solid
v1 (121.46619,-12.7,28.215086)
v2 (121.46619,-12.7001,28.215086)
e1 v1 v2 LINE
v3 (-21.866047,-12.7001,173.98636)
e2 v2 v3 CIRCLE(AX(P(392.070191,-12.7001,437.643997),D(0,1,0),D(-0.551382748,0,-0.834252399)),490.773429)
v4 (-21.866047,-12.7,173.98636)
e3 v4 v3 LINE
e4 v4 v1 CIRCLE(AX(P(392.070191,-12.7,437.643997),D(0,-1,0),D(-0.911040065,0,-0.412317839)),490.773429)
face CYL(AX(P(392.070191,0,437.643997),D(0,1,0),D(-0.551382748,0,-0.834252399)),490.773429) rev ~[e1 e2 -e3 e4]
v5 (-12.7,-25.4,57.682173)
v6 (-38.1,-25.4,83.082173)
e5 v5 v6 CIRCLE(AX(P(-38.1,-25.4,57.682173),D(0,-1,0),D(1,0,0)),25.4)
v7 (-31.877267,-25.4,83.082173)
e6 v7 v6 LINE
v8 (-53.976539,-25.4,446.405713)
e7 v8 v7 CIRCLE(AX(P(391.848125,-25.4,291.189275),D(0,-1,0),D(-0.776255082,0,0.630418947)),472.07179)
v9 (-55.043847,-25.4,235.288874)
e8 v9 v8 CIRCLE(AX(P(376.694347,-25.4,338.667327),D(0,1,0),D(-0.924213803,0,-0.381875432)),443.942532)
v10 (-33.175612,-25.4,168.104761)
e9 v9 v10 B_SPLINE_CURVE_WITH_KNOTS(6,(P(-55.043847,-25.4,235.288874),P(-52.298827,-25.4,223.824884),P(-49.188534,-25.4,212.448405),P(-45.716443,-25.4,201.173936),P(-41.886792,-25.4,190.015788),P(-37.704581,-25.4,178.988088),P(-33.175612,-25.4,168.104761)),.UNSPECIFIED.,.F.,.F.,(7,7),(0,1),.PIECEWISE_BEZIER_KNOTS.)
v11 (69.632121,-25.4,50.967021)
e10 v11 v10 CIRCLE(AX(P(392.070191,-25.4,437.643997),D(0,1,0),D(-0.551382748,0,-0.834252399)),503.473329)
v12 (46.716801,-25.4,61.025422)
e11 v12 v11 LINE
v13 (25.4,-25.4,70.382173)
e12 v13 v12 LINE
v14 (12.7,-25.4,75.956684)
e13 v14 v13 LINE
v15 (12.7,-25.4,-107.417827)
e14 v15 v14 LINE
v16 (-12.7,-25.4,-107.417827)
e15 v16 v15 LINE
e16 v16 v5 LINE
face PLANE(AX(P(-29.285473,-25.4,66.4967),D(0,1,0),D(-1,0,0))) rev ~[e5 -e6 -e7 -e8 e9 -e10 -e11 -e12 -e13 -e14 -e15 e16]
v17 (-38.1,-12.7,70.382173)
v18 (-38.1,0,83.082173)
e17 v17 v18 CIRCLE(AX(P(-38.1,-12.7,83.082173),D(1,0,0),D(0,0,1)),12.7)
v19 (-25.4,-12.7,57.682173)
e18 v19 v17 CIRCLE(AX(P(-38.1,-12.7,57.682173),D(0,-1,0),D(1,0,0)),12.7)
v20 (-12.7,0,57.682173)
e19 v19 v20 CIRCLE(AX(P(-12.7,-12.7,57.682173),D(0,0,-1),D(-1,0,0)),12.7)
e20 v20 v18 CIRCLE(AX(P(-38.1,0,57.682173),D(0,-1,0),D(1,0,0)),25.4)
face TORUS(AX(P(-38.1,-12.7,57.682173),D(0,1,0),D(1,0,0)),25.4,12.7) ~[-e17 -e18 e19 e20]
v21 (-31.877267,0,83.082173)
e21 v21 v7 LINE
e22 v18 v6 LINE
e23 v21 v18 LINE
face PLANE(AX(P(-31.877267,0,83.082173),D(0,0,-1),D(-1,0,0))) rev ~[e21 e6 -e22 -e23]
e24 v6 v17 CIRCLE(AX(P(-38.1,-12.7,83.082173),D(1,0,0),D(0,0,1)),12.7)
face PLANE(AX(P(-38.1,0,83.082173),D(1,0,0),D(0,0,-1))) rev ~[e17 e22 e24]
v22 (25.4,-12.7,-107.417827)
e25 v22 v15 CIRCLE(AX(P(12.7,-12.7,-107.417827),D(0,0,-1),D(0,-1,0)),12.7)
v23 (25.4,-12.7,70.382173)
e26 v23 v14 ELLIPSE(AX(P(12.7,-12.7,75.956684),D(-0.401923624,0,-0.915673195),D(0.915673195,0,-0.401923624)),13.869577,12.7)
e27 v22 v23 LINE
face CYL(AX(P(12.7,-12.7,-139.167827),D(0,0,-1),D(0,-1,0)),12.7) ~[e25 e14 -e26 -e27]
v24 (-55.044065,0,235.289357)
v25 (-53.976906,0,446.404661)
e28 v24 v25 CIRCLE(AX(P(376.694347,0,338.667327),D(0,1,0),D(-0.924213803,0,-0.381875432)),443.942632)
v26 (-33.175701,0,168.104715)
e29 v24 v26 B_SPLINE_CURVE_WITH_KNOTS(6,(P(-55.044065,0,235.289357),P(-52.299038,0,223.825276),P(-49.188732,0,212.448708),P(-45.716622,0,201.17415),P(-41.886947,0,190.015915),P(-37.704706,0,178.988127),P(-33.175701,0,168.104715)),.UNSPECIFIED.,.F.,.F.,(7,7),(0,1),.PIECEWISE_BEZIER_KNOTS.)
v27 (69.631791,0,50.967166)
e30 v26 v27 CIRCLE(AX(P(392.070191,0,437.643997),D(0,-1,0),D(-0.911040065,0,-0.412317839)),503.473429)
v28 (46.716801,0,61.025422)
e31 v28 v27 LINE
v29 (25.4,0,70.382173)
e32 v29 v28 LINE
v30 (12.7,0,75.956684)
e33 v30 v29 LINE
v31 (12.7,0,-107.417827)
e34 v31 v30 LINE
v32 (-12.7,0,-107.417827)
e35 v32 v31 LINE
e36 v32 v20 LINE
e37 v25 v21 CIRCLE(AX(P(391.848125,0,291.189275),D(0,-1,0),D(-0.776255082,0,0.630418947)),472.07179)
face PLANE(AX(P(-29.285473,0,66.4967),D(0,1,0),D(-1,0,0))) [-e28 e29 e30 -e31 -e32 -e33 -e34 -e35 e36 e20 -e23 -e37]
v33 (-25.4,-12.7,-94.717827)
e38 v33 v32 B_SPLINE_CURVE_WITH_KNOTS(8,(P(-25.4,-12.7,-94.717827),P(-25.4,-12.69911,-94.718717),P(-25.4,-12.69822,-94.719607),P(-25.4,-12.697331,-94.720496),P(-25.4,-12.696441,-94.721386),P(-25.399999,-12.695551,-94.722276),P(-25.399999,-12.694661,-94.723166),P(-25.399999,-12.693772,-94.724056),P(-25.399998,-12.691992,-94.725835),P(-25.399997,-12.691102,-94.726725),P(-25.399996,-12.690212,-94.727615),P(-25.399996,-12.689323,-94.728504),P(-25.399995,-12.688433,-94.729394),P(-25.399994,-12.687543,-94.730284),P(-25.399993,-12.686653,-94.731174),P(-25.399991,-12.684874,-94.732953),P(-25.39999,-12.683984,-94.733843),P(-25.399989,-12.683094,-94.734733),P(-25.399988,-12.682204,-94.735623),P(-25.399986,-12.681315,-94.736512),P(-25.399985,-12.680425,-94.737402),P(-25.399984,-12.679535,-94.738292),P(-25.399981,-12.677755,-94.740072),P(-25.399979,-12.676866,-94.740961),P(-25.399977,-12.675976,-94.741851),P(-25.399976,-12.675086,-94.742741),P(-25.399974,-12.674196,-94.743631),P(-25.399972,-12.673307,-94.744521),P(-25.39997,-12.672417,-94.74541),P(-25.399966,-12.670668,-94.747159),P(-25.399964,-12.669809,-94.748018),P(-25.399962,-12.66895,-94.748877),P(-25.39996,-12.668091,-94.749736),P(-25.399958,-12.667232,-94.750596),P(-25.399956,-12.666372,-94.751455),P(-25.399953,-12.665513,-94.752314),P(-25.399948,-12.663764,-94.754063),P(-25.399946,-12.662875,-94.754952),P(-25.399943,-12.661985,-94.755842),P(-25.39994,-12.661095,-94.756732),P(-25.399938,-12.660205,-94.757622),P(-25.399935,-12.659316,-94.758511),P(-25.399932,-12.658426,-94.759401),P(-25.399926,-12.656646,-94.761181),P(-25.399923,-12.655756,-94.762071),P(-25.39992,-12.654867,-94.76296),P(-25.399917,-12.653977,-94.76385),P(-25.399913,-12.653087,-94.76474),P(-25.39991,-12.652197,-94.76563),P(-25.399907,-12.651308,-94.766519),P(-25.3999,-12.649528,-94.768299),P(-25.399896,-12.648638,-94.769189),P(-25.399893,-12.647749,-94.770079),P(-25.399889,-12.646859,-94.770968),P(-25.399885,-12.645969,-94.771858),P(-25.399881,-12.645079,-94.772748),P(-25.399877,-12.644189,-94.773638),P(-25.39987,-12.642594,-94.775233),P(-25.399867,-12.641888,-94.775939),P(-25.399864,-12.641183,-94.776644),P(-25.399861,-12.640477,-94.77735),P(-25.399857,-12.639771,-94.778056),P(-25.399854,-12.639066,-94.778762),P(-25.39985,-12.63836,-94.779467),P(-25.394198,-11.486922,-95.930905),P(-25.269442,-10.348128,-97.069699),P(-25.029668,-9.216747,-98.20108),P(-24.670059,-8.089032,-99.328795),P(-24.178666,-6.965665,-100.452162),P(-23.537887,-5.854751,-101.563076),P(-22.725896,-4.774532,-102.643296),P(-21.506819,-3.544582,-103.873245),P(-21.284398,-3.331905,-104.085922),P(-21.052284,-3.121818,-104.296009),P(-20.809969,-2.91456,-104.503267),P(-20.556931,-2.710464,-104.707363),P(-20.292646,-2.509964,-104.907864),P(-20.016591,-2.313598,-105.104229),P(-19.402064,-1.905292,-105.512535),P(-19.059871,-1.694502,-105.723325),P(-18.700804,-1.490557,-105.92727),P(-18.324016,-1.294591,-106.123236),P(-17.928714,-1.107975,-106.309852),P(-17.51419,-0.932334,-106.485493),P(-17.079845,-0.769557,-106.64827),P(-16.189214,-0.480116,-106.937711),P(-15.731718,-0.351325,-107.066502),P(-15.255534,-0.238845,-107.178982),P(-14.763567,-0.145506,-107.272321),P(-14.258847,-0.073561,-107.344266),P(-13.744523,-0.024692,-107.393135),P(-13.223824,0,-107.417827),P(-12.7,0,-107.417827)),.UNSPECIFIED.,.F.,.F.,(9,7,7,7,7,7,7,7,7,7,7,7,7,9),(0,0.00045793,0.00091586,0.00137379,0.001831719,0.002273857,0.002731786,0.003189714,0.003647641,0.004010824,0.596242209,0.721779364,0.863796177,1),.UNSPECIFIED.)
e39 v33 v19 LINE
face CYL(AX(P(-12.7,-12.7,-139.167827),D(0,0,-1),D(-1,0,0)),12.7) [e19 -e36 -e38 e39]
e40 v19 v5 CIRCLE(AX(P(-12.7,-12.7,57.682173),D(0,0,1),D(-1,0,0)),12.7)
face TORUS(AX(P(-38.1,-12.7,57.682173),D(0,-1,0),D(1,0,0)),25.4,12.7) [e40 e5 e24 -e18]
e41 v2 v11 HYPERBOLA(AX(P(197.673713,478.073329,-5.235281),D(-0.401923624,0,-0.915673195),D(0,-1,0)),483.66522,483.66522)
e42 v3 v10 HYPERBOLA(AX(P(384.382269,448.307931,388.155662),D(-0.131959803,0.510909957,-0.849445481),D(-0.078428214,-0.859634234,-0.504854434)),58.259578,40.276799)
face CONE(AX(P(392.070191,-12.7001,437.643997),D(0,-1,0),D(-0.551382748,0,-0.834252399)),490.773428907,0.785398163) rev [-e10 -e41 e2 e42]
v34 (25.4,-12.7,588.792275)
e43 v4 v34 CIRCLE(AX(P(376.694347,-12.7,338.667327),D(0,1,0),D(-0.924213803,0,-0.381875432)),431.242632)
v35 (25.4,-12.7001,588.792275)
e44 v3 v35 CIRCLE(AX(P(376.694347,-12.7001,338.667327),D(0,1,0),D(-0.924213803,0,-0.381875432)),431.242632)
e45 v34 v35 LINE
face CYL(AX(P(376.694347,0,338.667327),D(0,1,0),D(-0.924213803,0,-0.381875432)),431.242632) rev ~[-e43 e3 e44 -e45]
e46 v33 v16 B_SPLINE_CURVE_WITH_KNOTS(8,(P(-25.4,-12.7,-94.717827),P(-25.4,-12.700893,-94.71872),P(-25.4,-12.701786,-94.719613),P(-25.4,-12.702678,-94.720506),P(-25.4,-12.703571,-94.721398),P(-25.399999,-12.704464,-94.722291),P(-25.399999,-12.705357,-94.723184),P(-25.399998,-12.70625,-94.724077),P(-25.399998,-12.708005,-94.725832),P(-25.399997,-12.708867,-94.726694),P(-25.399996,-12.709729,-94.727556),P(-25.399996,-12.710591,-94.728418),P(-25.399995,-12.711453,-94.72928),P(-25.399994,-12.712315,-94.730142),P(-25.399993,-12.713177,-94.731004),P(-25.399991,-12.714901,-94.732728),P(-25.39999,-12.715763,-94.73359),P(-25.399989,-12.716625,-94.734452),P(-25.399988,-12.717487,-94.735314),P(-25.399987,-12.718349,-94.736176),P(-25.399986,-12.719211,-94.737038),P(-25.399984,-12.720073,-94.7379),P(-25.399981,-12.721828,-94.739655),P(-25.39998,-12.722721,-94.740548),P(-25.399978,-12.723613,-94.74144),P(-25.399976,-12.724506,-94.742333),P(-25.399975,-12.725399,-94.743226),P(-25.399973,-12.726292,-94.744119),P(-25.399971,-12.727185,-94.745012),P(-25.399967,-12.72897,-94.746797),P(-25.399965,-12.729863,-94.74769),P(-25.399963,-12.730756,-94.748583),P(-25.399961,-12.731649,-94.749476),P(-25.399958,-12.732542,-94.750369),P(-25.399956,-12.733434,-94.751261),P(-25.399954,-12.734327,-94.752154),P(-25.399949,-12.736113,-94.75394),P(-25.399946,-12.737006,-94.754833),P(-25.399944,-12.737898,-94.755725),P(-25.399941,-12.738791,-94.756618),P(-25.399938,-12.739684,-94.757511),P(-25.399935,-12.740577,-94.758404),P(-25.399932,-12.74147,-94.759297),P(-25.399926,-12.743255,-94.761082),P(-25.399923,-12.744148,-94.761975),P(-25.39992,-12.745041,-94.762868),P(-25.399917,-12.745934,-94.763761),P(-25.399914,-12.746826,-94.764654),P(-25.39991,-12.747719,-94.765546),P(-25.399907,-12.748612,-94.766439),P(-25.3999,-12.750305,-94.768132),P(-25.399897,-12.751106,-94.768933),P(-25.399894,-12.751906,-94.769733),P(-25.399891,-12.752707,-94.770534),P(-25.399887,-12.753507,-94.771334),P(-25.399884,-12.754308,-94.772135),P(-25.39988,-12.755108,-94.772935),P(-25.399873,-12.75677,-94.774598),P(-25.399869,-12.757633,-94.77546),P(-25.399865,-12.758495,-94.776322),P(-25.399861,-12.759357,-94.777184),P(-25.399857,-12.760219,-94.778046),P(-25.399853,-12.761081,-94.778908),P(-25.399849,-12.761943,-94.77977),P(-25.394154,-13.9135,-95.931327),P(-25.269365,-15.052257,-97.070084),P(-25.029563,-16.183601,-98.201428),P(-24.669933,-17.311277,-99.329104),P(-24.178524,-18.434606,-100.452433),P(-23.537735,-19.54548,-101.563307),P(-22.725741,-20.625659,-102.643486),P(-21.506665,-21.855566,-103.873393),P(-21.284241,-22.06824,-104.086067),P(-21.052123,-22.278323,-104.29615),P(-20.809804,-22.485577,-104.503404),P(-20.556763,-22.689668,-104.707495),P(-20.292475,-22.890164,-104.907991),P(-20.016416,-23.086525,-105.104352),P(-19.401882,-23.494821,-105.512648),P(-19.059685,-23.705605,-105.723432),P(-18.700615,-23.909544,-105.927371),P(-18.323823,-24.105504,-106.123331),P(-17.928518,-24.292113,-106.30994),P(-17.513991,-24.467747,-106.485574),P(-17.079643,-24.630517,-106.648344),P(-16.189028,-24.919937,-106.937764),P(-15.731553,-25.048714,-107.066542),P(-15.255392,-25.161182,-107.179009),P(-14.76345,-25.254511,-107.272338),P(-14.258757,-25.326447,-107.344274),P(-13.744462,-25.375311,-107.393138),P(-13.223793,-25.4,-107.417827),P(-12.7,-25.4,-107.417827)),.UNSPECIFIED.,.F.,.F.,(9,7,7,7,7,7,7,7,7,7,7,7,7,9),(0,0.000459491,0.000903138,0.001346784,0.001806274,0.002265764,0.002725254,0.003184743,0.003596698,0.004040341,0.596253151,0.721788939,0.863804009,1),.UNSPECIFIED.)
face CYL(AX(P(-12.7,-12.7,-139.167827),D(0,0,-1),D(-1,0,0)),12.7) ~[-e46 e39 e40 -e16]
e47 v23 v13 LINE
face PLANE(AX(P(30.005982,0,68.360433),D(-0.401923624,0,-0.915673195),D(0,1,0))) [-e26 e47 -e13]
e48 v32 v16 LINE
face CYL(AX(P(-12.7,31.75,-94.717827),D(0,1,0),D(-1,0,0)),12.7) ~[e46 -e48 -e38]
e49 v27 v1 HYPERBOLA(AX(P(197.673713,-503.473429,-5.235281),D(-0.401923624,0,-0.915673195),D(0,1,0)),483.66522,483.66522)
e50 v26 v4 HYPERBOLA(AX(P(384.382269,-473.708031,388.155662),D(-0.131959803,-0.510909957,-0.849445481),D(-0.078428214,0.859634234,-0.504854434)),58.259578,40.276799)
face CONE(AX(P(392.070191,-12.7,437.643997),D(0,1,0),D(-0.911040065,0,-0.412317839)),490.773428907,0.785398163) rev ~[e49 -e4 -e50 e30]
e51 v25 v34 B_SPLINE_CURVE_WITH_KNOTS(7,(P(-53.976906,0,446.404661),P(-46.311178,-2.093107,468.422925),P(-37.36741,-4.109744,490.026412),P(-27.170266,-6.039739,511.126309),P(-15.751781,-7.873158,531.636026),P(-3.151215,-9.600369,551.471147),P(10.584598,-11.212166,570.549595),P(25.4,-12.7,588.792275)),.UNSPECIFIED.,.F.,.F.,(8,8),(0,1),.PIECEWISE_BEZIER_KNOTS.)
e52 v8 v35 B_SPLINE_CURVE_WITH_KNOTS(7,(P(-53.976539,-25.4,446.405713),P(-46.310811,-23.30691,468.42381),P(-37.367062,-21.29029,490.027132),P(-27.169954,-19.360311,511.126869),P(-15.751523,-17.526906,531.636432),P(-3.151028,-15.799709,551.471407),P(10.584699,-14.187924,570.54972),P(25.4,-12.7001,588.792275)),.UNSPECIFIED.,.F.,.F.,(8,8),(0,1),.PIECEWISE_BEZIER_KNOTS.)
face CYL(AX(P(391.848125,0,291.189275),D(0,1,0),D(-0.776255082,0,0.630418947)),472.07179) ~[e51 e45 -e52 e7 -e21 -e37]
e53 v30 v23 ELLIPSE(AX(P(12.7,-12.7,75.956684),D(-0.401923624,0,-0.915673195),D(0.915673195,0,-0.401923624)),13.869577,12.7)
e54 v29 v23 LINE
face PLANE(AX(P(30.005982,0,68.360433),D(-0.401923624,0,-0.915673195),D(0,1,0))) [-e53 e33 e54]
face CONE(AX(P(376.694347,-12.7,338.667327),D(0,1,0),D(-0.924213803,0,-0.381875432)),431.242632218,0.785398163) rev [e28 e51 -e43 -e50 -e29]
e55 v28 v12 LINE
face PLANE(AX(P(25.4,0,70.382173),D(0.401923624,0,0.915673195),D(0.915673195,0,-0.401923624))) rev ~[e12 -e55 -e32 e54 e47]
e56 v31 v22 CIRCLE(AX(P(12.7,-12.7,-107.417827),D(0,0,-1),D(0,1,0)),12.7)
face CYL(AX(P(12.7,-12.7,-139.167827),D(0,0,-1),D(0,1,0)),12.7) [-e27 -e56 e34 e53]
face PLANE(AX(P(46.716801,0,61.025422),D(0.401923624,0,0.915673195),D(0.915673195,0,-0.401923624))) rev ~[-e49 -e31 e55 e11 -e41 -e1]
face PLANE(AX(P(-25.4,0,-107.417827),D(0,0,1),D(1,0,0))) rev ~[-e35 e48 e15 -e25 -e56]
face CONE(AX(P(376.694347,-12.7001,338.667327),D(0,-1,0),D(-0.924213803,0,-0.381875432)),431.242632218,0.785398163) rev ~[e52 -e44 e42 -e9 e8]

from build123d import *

# Parameters (mm, degrees)
F1_DEPTH     = 25.4
F2_T1_DEPTH  = 25.4
F2_T3_DEPTH  = 196.85
F2_T5_DEPTH  = 88.9
F2_T10_DEPTH = 241.3
F2_T15_DEPTH = 241.3
F2_T18_ANGLE = 233.2969892374
F2_T20_ANGLE = 233.2969892374
F3_C1_SIZE   = 12.7
F3_C2_SIZE   = 12.7
F3_C3_SIZE   = 12.6999
F3_C4_SIZE   = 12.6999


# Not quite as in the source:
# - a fillet or chamfer that OpenCascade refuses, or shapes differently, is made with other operations: its cross-section is extruded or revolved along the edge and cut away or added
# - a fillet or chamfer is up to 0.001 mm smaller than in the source, because OpenCascade refuses the exact size


with BuildPart() as f1:
    # F0 (on Front) → F1 (new body)
    with BuildSketch(Plane.XZ):
        Polygon((-25.4, -107.4178270914), (0, -107.4178270914), (25.4, -107.4178270914), (25.4, 70.3821729086), (-25.4, 70.3821729086), align=None)
        with BuildLine():
            ThreePointArc((-31.8772674395, 83.0821729086), (-28.6865783939, 76.7077201152), (-25.4, 70.3821729086))
            Line((-25.4, 70.3821729086), (25.4, 70.3821729086))
            Line((25.4, 70.3821729086), (46.7168006713, 61.0254222331))
            ThreePointArc((46.7168006713, 61.0254222331), (8.0726901659, 114.8632107301), (-21.8660467054, 173.9863600165))
            ThreePointArc((-21.8660467054, 173.9863600165), (-51.7756284743, 387.4903570682), (25.4, 588.7922751123))
            ThreePointArc((25.4, 588.7922751123), (-77.2246025315, 344.3169540256), (-31.8772674395, 83.0821729086))
        make_face()
        with BuildLine():
            Line((-38.1, 70.3821729086), (-25.4, 70.3821729086))
            ThreePointArc((-25.4, 70.3821729086), (-28.6865783939, 76.7077201152), (-31.8772674395, 83.0821729086))
            Line((-31.8772674395, 83.0821729086), (-38.1, 83.0821729086))
            Line((-38.1, 83.0821729086), (-38.1, 70.3821729086))
        make_face()
        with BuildLine():
            ThreePointArc((-21.8660467054, 173.9863600165), (8.0726901659, 114.8632107301), (46.7168006713, 61.0254222331))
            Line((46.7168006713, 61.0254222331), (121.4661896229, 28.2150860876))
            ThreePointArc((121.4661896229, 28.2150860876), (42.125694257, 93.5547531424), (-21.8660467054, 173.9863600165))
        make_face()
    extrude(amount=F1_DEPTH)

    # F2: fillet of radius 12.7 on 6 edges, made by hand

    # F2_s2 → F2_t1 (join)
    with BuildSketch(Plane.XZ):
        with BuildLine():
            ThreePointArc((-25.4, 57.6821729086), (-29.1197438789, 66.6624290297), (-38.1, 70.3821729086))
            Line((-38.1, 70.3821729086), (-25.4, 70.3821729086))
            Line((-25.4, 70.3821729086), (-25.4, 57.6821729086))
        make_face()
    extrude(amount=F2_T1_DEPTH)

    # F2_s4 → F2_t3 (cut)
    with BuildSketch(Plane.XY.offset(-139.1678270914)):
        with BuildLine():
            ThreePointArc((-25.4, -12.7), (-21.6802561211, -3.7197438789), (-12.7, 0))
            Line((-12.7, 0), (-25.4, 0))
            Line((-25.4, 0), (-25.4, -12.7))
        make_face()
        with BuildLine():
            ThreePointArc((-25.4, -12.7), (-21.6802561211, -21.6802561211), (-12.7, -25.4))
            Line((-12.7, -25.4), (-25.4, -25.4))
            Line((-25.4, -25.4), (-25.4, -12.7))
        make_face()
    extrude(amount=F2_T3_DEPTH, mode=Mode.SUBTRACT)

    # F2_s6 → F2_t5 (cut)
    with BuildSketch(Plane.XZ.offset(-31.75)):
        with BuildLine():
            ThreePointArc((-25.4, -94.7178270914), (-21.6802561211, -103.6980832124), (-12.7, -107.4178270914))
            Line((-12.7, -107.4178270914), (-25.4, -107.4178270914))
            Line((-25.4, -107.4178270914), (-25.4, -94.7178270914))
        make_face()
    extrude(amount=F2_T5_DEPTH, mode=Mode.SUBTRACT)


with BuildPart() as f2_tool8:
    # F2_s9 → F2_t10 (new body)
    with BuildSketch(Plane.XY.offset(-139.1678270914)):
        with BuildLine():
            ThreePointArc((12.7, 0), (21.6802561211, -3.7197438789), (25.4, -12.7))
            Line((25.4, -12.7), (25.4, 0))
            Line((25.4, 0), (12.7, 0))
        make_face()
    extrude(amount=F2_T10_DEPTH)

    split(bisect_by=Plane(origin=(30.005981648, 0, 68.3604332226), x_dir=(0, 1, 0), z_dir=(-0.4019236244, 0, -0.9156731951)), keep=Keep.TOP)


with BuildPart() as f1_1:
    add(f1.part)

    # F2_t7: cut F2_tool8
    add(f2_tool8.part, mode=Mode.SUBTRACT)


with BuildPart() as f2_tool13:
    # F2_s14 → F2_t15 (new body)
    with BuildSketch(Plane.XY.offset(-139.1678270914)):
        with BuildLine():
            ThreePointArc((12.7, -25.4), (21.6802561211, -21.6802561211), (25.4, -12.7))
            Line((25.4, -12.7), (25.4, -25.4))
            Line((25.4, -25.4), (12.7, -25.4))
        make_face()
    extrude(amount=F2_T15_DEPTH)

    split(bisect_by=Plane(origin=(30.005981648, 0, 68.3604332226), x_dir=(0, 1, 0), z_dir=(-0.4019236244, 0, -0.9156731951)), keep=Keep.TOP)


with BuildPart() as f1_2:
    add(f1_1.part)

    # F2_t12: cut F2_tool13
    add(f2_tool13.part, mode=Mode.SUBTRACT)

    # F2_s17 → F2_t18 (revolve, cut)
    with BuildSketch(Plane.XY.offset(57.6821729086)):
        with BuildLine():
            ThreePointArc((-12.7, -25.4), (-21.6802561211, -21.6802561211), (-25.4, -12.7))
            Line((-25.4, -12.7), (-25.4, -25.4))
            Line((-25.4, -25.4), (-12.7, -25.4))
        make_face()
    revolve(axis=Axis((-38.1, -25.4, 57.6821729086), (0, -1, 0)), revolution_arc=F2_T18_ANGLE, mode=Mode.SUBTRACT)

    # F2_s19 → F2_t20 (revolve, cut)
    with BuildSketch(Plane.XY.offset(57.6821729086)):
        with BuildLine():
            ThreePointArc((-12.7, 0), (-21.6802561211, -3.7197438789), (-25.4, -12.7))
            Line((-25.4, -12.7), (-25.4, 0))
            Line((-25.4, 0), (-12.7, 0))
        make_face()
    revolve(axis=Axis((-38.1, 0, 57.6821729086), (0, -1, 0)), revolution_arc=F2_T20_ANGLE, mode=Mode.SUBTRACT)

    # F3: chamfer of 12.7 on 4 edges, made by hand

    # F3_c1
    f3_c1_edges = [f1_2.edges().sort_by_distance(p)[0] for p in [
        (-51.7756284743, 0, 387.4903570682),
    ]]
    chamfer(f3_c1_edges, length=F3_C1_SIZE)

    # F3_c2
    f3_c2_edges = [f1_2.edges().sort_by_distance(p)[0] for p in [
        (42.125694257, 0, 93.5547531424),
    ]]
    chamfer(f3_c2_edges, length=F3_C2_SIZE)

    # F3_c3 (size 12.7 in the source; OpenCascade refuses exactly that, so slightly less here)
    f3_c3_edges = [f1_2.edges().sort_by_distance(p)[0] for p in [
        (-51.7756284743, -25.4, 387.4903570682),
    ]]
    chamfer(f3_c3_edges, length=F3_C3_SIZE)

    # F3_c4 (size 12.7 in the source; OpenCascade refuses exactly that, so slightly less here)
    f3_c4_edges = [f1_2.edges().sort_by_distance(p)[0] for p in [
        (42.125694257, -25.4, 93.5547531424),
    ]]
    chamfer(f3_c4_edges, length=F3_C4_SIZE)


solid = f1_2.part
